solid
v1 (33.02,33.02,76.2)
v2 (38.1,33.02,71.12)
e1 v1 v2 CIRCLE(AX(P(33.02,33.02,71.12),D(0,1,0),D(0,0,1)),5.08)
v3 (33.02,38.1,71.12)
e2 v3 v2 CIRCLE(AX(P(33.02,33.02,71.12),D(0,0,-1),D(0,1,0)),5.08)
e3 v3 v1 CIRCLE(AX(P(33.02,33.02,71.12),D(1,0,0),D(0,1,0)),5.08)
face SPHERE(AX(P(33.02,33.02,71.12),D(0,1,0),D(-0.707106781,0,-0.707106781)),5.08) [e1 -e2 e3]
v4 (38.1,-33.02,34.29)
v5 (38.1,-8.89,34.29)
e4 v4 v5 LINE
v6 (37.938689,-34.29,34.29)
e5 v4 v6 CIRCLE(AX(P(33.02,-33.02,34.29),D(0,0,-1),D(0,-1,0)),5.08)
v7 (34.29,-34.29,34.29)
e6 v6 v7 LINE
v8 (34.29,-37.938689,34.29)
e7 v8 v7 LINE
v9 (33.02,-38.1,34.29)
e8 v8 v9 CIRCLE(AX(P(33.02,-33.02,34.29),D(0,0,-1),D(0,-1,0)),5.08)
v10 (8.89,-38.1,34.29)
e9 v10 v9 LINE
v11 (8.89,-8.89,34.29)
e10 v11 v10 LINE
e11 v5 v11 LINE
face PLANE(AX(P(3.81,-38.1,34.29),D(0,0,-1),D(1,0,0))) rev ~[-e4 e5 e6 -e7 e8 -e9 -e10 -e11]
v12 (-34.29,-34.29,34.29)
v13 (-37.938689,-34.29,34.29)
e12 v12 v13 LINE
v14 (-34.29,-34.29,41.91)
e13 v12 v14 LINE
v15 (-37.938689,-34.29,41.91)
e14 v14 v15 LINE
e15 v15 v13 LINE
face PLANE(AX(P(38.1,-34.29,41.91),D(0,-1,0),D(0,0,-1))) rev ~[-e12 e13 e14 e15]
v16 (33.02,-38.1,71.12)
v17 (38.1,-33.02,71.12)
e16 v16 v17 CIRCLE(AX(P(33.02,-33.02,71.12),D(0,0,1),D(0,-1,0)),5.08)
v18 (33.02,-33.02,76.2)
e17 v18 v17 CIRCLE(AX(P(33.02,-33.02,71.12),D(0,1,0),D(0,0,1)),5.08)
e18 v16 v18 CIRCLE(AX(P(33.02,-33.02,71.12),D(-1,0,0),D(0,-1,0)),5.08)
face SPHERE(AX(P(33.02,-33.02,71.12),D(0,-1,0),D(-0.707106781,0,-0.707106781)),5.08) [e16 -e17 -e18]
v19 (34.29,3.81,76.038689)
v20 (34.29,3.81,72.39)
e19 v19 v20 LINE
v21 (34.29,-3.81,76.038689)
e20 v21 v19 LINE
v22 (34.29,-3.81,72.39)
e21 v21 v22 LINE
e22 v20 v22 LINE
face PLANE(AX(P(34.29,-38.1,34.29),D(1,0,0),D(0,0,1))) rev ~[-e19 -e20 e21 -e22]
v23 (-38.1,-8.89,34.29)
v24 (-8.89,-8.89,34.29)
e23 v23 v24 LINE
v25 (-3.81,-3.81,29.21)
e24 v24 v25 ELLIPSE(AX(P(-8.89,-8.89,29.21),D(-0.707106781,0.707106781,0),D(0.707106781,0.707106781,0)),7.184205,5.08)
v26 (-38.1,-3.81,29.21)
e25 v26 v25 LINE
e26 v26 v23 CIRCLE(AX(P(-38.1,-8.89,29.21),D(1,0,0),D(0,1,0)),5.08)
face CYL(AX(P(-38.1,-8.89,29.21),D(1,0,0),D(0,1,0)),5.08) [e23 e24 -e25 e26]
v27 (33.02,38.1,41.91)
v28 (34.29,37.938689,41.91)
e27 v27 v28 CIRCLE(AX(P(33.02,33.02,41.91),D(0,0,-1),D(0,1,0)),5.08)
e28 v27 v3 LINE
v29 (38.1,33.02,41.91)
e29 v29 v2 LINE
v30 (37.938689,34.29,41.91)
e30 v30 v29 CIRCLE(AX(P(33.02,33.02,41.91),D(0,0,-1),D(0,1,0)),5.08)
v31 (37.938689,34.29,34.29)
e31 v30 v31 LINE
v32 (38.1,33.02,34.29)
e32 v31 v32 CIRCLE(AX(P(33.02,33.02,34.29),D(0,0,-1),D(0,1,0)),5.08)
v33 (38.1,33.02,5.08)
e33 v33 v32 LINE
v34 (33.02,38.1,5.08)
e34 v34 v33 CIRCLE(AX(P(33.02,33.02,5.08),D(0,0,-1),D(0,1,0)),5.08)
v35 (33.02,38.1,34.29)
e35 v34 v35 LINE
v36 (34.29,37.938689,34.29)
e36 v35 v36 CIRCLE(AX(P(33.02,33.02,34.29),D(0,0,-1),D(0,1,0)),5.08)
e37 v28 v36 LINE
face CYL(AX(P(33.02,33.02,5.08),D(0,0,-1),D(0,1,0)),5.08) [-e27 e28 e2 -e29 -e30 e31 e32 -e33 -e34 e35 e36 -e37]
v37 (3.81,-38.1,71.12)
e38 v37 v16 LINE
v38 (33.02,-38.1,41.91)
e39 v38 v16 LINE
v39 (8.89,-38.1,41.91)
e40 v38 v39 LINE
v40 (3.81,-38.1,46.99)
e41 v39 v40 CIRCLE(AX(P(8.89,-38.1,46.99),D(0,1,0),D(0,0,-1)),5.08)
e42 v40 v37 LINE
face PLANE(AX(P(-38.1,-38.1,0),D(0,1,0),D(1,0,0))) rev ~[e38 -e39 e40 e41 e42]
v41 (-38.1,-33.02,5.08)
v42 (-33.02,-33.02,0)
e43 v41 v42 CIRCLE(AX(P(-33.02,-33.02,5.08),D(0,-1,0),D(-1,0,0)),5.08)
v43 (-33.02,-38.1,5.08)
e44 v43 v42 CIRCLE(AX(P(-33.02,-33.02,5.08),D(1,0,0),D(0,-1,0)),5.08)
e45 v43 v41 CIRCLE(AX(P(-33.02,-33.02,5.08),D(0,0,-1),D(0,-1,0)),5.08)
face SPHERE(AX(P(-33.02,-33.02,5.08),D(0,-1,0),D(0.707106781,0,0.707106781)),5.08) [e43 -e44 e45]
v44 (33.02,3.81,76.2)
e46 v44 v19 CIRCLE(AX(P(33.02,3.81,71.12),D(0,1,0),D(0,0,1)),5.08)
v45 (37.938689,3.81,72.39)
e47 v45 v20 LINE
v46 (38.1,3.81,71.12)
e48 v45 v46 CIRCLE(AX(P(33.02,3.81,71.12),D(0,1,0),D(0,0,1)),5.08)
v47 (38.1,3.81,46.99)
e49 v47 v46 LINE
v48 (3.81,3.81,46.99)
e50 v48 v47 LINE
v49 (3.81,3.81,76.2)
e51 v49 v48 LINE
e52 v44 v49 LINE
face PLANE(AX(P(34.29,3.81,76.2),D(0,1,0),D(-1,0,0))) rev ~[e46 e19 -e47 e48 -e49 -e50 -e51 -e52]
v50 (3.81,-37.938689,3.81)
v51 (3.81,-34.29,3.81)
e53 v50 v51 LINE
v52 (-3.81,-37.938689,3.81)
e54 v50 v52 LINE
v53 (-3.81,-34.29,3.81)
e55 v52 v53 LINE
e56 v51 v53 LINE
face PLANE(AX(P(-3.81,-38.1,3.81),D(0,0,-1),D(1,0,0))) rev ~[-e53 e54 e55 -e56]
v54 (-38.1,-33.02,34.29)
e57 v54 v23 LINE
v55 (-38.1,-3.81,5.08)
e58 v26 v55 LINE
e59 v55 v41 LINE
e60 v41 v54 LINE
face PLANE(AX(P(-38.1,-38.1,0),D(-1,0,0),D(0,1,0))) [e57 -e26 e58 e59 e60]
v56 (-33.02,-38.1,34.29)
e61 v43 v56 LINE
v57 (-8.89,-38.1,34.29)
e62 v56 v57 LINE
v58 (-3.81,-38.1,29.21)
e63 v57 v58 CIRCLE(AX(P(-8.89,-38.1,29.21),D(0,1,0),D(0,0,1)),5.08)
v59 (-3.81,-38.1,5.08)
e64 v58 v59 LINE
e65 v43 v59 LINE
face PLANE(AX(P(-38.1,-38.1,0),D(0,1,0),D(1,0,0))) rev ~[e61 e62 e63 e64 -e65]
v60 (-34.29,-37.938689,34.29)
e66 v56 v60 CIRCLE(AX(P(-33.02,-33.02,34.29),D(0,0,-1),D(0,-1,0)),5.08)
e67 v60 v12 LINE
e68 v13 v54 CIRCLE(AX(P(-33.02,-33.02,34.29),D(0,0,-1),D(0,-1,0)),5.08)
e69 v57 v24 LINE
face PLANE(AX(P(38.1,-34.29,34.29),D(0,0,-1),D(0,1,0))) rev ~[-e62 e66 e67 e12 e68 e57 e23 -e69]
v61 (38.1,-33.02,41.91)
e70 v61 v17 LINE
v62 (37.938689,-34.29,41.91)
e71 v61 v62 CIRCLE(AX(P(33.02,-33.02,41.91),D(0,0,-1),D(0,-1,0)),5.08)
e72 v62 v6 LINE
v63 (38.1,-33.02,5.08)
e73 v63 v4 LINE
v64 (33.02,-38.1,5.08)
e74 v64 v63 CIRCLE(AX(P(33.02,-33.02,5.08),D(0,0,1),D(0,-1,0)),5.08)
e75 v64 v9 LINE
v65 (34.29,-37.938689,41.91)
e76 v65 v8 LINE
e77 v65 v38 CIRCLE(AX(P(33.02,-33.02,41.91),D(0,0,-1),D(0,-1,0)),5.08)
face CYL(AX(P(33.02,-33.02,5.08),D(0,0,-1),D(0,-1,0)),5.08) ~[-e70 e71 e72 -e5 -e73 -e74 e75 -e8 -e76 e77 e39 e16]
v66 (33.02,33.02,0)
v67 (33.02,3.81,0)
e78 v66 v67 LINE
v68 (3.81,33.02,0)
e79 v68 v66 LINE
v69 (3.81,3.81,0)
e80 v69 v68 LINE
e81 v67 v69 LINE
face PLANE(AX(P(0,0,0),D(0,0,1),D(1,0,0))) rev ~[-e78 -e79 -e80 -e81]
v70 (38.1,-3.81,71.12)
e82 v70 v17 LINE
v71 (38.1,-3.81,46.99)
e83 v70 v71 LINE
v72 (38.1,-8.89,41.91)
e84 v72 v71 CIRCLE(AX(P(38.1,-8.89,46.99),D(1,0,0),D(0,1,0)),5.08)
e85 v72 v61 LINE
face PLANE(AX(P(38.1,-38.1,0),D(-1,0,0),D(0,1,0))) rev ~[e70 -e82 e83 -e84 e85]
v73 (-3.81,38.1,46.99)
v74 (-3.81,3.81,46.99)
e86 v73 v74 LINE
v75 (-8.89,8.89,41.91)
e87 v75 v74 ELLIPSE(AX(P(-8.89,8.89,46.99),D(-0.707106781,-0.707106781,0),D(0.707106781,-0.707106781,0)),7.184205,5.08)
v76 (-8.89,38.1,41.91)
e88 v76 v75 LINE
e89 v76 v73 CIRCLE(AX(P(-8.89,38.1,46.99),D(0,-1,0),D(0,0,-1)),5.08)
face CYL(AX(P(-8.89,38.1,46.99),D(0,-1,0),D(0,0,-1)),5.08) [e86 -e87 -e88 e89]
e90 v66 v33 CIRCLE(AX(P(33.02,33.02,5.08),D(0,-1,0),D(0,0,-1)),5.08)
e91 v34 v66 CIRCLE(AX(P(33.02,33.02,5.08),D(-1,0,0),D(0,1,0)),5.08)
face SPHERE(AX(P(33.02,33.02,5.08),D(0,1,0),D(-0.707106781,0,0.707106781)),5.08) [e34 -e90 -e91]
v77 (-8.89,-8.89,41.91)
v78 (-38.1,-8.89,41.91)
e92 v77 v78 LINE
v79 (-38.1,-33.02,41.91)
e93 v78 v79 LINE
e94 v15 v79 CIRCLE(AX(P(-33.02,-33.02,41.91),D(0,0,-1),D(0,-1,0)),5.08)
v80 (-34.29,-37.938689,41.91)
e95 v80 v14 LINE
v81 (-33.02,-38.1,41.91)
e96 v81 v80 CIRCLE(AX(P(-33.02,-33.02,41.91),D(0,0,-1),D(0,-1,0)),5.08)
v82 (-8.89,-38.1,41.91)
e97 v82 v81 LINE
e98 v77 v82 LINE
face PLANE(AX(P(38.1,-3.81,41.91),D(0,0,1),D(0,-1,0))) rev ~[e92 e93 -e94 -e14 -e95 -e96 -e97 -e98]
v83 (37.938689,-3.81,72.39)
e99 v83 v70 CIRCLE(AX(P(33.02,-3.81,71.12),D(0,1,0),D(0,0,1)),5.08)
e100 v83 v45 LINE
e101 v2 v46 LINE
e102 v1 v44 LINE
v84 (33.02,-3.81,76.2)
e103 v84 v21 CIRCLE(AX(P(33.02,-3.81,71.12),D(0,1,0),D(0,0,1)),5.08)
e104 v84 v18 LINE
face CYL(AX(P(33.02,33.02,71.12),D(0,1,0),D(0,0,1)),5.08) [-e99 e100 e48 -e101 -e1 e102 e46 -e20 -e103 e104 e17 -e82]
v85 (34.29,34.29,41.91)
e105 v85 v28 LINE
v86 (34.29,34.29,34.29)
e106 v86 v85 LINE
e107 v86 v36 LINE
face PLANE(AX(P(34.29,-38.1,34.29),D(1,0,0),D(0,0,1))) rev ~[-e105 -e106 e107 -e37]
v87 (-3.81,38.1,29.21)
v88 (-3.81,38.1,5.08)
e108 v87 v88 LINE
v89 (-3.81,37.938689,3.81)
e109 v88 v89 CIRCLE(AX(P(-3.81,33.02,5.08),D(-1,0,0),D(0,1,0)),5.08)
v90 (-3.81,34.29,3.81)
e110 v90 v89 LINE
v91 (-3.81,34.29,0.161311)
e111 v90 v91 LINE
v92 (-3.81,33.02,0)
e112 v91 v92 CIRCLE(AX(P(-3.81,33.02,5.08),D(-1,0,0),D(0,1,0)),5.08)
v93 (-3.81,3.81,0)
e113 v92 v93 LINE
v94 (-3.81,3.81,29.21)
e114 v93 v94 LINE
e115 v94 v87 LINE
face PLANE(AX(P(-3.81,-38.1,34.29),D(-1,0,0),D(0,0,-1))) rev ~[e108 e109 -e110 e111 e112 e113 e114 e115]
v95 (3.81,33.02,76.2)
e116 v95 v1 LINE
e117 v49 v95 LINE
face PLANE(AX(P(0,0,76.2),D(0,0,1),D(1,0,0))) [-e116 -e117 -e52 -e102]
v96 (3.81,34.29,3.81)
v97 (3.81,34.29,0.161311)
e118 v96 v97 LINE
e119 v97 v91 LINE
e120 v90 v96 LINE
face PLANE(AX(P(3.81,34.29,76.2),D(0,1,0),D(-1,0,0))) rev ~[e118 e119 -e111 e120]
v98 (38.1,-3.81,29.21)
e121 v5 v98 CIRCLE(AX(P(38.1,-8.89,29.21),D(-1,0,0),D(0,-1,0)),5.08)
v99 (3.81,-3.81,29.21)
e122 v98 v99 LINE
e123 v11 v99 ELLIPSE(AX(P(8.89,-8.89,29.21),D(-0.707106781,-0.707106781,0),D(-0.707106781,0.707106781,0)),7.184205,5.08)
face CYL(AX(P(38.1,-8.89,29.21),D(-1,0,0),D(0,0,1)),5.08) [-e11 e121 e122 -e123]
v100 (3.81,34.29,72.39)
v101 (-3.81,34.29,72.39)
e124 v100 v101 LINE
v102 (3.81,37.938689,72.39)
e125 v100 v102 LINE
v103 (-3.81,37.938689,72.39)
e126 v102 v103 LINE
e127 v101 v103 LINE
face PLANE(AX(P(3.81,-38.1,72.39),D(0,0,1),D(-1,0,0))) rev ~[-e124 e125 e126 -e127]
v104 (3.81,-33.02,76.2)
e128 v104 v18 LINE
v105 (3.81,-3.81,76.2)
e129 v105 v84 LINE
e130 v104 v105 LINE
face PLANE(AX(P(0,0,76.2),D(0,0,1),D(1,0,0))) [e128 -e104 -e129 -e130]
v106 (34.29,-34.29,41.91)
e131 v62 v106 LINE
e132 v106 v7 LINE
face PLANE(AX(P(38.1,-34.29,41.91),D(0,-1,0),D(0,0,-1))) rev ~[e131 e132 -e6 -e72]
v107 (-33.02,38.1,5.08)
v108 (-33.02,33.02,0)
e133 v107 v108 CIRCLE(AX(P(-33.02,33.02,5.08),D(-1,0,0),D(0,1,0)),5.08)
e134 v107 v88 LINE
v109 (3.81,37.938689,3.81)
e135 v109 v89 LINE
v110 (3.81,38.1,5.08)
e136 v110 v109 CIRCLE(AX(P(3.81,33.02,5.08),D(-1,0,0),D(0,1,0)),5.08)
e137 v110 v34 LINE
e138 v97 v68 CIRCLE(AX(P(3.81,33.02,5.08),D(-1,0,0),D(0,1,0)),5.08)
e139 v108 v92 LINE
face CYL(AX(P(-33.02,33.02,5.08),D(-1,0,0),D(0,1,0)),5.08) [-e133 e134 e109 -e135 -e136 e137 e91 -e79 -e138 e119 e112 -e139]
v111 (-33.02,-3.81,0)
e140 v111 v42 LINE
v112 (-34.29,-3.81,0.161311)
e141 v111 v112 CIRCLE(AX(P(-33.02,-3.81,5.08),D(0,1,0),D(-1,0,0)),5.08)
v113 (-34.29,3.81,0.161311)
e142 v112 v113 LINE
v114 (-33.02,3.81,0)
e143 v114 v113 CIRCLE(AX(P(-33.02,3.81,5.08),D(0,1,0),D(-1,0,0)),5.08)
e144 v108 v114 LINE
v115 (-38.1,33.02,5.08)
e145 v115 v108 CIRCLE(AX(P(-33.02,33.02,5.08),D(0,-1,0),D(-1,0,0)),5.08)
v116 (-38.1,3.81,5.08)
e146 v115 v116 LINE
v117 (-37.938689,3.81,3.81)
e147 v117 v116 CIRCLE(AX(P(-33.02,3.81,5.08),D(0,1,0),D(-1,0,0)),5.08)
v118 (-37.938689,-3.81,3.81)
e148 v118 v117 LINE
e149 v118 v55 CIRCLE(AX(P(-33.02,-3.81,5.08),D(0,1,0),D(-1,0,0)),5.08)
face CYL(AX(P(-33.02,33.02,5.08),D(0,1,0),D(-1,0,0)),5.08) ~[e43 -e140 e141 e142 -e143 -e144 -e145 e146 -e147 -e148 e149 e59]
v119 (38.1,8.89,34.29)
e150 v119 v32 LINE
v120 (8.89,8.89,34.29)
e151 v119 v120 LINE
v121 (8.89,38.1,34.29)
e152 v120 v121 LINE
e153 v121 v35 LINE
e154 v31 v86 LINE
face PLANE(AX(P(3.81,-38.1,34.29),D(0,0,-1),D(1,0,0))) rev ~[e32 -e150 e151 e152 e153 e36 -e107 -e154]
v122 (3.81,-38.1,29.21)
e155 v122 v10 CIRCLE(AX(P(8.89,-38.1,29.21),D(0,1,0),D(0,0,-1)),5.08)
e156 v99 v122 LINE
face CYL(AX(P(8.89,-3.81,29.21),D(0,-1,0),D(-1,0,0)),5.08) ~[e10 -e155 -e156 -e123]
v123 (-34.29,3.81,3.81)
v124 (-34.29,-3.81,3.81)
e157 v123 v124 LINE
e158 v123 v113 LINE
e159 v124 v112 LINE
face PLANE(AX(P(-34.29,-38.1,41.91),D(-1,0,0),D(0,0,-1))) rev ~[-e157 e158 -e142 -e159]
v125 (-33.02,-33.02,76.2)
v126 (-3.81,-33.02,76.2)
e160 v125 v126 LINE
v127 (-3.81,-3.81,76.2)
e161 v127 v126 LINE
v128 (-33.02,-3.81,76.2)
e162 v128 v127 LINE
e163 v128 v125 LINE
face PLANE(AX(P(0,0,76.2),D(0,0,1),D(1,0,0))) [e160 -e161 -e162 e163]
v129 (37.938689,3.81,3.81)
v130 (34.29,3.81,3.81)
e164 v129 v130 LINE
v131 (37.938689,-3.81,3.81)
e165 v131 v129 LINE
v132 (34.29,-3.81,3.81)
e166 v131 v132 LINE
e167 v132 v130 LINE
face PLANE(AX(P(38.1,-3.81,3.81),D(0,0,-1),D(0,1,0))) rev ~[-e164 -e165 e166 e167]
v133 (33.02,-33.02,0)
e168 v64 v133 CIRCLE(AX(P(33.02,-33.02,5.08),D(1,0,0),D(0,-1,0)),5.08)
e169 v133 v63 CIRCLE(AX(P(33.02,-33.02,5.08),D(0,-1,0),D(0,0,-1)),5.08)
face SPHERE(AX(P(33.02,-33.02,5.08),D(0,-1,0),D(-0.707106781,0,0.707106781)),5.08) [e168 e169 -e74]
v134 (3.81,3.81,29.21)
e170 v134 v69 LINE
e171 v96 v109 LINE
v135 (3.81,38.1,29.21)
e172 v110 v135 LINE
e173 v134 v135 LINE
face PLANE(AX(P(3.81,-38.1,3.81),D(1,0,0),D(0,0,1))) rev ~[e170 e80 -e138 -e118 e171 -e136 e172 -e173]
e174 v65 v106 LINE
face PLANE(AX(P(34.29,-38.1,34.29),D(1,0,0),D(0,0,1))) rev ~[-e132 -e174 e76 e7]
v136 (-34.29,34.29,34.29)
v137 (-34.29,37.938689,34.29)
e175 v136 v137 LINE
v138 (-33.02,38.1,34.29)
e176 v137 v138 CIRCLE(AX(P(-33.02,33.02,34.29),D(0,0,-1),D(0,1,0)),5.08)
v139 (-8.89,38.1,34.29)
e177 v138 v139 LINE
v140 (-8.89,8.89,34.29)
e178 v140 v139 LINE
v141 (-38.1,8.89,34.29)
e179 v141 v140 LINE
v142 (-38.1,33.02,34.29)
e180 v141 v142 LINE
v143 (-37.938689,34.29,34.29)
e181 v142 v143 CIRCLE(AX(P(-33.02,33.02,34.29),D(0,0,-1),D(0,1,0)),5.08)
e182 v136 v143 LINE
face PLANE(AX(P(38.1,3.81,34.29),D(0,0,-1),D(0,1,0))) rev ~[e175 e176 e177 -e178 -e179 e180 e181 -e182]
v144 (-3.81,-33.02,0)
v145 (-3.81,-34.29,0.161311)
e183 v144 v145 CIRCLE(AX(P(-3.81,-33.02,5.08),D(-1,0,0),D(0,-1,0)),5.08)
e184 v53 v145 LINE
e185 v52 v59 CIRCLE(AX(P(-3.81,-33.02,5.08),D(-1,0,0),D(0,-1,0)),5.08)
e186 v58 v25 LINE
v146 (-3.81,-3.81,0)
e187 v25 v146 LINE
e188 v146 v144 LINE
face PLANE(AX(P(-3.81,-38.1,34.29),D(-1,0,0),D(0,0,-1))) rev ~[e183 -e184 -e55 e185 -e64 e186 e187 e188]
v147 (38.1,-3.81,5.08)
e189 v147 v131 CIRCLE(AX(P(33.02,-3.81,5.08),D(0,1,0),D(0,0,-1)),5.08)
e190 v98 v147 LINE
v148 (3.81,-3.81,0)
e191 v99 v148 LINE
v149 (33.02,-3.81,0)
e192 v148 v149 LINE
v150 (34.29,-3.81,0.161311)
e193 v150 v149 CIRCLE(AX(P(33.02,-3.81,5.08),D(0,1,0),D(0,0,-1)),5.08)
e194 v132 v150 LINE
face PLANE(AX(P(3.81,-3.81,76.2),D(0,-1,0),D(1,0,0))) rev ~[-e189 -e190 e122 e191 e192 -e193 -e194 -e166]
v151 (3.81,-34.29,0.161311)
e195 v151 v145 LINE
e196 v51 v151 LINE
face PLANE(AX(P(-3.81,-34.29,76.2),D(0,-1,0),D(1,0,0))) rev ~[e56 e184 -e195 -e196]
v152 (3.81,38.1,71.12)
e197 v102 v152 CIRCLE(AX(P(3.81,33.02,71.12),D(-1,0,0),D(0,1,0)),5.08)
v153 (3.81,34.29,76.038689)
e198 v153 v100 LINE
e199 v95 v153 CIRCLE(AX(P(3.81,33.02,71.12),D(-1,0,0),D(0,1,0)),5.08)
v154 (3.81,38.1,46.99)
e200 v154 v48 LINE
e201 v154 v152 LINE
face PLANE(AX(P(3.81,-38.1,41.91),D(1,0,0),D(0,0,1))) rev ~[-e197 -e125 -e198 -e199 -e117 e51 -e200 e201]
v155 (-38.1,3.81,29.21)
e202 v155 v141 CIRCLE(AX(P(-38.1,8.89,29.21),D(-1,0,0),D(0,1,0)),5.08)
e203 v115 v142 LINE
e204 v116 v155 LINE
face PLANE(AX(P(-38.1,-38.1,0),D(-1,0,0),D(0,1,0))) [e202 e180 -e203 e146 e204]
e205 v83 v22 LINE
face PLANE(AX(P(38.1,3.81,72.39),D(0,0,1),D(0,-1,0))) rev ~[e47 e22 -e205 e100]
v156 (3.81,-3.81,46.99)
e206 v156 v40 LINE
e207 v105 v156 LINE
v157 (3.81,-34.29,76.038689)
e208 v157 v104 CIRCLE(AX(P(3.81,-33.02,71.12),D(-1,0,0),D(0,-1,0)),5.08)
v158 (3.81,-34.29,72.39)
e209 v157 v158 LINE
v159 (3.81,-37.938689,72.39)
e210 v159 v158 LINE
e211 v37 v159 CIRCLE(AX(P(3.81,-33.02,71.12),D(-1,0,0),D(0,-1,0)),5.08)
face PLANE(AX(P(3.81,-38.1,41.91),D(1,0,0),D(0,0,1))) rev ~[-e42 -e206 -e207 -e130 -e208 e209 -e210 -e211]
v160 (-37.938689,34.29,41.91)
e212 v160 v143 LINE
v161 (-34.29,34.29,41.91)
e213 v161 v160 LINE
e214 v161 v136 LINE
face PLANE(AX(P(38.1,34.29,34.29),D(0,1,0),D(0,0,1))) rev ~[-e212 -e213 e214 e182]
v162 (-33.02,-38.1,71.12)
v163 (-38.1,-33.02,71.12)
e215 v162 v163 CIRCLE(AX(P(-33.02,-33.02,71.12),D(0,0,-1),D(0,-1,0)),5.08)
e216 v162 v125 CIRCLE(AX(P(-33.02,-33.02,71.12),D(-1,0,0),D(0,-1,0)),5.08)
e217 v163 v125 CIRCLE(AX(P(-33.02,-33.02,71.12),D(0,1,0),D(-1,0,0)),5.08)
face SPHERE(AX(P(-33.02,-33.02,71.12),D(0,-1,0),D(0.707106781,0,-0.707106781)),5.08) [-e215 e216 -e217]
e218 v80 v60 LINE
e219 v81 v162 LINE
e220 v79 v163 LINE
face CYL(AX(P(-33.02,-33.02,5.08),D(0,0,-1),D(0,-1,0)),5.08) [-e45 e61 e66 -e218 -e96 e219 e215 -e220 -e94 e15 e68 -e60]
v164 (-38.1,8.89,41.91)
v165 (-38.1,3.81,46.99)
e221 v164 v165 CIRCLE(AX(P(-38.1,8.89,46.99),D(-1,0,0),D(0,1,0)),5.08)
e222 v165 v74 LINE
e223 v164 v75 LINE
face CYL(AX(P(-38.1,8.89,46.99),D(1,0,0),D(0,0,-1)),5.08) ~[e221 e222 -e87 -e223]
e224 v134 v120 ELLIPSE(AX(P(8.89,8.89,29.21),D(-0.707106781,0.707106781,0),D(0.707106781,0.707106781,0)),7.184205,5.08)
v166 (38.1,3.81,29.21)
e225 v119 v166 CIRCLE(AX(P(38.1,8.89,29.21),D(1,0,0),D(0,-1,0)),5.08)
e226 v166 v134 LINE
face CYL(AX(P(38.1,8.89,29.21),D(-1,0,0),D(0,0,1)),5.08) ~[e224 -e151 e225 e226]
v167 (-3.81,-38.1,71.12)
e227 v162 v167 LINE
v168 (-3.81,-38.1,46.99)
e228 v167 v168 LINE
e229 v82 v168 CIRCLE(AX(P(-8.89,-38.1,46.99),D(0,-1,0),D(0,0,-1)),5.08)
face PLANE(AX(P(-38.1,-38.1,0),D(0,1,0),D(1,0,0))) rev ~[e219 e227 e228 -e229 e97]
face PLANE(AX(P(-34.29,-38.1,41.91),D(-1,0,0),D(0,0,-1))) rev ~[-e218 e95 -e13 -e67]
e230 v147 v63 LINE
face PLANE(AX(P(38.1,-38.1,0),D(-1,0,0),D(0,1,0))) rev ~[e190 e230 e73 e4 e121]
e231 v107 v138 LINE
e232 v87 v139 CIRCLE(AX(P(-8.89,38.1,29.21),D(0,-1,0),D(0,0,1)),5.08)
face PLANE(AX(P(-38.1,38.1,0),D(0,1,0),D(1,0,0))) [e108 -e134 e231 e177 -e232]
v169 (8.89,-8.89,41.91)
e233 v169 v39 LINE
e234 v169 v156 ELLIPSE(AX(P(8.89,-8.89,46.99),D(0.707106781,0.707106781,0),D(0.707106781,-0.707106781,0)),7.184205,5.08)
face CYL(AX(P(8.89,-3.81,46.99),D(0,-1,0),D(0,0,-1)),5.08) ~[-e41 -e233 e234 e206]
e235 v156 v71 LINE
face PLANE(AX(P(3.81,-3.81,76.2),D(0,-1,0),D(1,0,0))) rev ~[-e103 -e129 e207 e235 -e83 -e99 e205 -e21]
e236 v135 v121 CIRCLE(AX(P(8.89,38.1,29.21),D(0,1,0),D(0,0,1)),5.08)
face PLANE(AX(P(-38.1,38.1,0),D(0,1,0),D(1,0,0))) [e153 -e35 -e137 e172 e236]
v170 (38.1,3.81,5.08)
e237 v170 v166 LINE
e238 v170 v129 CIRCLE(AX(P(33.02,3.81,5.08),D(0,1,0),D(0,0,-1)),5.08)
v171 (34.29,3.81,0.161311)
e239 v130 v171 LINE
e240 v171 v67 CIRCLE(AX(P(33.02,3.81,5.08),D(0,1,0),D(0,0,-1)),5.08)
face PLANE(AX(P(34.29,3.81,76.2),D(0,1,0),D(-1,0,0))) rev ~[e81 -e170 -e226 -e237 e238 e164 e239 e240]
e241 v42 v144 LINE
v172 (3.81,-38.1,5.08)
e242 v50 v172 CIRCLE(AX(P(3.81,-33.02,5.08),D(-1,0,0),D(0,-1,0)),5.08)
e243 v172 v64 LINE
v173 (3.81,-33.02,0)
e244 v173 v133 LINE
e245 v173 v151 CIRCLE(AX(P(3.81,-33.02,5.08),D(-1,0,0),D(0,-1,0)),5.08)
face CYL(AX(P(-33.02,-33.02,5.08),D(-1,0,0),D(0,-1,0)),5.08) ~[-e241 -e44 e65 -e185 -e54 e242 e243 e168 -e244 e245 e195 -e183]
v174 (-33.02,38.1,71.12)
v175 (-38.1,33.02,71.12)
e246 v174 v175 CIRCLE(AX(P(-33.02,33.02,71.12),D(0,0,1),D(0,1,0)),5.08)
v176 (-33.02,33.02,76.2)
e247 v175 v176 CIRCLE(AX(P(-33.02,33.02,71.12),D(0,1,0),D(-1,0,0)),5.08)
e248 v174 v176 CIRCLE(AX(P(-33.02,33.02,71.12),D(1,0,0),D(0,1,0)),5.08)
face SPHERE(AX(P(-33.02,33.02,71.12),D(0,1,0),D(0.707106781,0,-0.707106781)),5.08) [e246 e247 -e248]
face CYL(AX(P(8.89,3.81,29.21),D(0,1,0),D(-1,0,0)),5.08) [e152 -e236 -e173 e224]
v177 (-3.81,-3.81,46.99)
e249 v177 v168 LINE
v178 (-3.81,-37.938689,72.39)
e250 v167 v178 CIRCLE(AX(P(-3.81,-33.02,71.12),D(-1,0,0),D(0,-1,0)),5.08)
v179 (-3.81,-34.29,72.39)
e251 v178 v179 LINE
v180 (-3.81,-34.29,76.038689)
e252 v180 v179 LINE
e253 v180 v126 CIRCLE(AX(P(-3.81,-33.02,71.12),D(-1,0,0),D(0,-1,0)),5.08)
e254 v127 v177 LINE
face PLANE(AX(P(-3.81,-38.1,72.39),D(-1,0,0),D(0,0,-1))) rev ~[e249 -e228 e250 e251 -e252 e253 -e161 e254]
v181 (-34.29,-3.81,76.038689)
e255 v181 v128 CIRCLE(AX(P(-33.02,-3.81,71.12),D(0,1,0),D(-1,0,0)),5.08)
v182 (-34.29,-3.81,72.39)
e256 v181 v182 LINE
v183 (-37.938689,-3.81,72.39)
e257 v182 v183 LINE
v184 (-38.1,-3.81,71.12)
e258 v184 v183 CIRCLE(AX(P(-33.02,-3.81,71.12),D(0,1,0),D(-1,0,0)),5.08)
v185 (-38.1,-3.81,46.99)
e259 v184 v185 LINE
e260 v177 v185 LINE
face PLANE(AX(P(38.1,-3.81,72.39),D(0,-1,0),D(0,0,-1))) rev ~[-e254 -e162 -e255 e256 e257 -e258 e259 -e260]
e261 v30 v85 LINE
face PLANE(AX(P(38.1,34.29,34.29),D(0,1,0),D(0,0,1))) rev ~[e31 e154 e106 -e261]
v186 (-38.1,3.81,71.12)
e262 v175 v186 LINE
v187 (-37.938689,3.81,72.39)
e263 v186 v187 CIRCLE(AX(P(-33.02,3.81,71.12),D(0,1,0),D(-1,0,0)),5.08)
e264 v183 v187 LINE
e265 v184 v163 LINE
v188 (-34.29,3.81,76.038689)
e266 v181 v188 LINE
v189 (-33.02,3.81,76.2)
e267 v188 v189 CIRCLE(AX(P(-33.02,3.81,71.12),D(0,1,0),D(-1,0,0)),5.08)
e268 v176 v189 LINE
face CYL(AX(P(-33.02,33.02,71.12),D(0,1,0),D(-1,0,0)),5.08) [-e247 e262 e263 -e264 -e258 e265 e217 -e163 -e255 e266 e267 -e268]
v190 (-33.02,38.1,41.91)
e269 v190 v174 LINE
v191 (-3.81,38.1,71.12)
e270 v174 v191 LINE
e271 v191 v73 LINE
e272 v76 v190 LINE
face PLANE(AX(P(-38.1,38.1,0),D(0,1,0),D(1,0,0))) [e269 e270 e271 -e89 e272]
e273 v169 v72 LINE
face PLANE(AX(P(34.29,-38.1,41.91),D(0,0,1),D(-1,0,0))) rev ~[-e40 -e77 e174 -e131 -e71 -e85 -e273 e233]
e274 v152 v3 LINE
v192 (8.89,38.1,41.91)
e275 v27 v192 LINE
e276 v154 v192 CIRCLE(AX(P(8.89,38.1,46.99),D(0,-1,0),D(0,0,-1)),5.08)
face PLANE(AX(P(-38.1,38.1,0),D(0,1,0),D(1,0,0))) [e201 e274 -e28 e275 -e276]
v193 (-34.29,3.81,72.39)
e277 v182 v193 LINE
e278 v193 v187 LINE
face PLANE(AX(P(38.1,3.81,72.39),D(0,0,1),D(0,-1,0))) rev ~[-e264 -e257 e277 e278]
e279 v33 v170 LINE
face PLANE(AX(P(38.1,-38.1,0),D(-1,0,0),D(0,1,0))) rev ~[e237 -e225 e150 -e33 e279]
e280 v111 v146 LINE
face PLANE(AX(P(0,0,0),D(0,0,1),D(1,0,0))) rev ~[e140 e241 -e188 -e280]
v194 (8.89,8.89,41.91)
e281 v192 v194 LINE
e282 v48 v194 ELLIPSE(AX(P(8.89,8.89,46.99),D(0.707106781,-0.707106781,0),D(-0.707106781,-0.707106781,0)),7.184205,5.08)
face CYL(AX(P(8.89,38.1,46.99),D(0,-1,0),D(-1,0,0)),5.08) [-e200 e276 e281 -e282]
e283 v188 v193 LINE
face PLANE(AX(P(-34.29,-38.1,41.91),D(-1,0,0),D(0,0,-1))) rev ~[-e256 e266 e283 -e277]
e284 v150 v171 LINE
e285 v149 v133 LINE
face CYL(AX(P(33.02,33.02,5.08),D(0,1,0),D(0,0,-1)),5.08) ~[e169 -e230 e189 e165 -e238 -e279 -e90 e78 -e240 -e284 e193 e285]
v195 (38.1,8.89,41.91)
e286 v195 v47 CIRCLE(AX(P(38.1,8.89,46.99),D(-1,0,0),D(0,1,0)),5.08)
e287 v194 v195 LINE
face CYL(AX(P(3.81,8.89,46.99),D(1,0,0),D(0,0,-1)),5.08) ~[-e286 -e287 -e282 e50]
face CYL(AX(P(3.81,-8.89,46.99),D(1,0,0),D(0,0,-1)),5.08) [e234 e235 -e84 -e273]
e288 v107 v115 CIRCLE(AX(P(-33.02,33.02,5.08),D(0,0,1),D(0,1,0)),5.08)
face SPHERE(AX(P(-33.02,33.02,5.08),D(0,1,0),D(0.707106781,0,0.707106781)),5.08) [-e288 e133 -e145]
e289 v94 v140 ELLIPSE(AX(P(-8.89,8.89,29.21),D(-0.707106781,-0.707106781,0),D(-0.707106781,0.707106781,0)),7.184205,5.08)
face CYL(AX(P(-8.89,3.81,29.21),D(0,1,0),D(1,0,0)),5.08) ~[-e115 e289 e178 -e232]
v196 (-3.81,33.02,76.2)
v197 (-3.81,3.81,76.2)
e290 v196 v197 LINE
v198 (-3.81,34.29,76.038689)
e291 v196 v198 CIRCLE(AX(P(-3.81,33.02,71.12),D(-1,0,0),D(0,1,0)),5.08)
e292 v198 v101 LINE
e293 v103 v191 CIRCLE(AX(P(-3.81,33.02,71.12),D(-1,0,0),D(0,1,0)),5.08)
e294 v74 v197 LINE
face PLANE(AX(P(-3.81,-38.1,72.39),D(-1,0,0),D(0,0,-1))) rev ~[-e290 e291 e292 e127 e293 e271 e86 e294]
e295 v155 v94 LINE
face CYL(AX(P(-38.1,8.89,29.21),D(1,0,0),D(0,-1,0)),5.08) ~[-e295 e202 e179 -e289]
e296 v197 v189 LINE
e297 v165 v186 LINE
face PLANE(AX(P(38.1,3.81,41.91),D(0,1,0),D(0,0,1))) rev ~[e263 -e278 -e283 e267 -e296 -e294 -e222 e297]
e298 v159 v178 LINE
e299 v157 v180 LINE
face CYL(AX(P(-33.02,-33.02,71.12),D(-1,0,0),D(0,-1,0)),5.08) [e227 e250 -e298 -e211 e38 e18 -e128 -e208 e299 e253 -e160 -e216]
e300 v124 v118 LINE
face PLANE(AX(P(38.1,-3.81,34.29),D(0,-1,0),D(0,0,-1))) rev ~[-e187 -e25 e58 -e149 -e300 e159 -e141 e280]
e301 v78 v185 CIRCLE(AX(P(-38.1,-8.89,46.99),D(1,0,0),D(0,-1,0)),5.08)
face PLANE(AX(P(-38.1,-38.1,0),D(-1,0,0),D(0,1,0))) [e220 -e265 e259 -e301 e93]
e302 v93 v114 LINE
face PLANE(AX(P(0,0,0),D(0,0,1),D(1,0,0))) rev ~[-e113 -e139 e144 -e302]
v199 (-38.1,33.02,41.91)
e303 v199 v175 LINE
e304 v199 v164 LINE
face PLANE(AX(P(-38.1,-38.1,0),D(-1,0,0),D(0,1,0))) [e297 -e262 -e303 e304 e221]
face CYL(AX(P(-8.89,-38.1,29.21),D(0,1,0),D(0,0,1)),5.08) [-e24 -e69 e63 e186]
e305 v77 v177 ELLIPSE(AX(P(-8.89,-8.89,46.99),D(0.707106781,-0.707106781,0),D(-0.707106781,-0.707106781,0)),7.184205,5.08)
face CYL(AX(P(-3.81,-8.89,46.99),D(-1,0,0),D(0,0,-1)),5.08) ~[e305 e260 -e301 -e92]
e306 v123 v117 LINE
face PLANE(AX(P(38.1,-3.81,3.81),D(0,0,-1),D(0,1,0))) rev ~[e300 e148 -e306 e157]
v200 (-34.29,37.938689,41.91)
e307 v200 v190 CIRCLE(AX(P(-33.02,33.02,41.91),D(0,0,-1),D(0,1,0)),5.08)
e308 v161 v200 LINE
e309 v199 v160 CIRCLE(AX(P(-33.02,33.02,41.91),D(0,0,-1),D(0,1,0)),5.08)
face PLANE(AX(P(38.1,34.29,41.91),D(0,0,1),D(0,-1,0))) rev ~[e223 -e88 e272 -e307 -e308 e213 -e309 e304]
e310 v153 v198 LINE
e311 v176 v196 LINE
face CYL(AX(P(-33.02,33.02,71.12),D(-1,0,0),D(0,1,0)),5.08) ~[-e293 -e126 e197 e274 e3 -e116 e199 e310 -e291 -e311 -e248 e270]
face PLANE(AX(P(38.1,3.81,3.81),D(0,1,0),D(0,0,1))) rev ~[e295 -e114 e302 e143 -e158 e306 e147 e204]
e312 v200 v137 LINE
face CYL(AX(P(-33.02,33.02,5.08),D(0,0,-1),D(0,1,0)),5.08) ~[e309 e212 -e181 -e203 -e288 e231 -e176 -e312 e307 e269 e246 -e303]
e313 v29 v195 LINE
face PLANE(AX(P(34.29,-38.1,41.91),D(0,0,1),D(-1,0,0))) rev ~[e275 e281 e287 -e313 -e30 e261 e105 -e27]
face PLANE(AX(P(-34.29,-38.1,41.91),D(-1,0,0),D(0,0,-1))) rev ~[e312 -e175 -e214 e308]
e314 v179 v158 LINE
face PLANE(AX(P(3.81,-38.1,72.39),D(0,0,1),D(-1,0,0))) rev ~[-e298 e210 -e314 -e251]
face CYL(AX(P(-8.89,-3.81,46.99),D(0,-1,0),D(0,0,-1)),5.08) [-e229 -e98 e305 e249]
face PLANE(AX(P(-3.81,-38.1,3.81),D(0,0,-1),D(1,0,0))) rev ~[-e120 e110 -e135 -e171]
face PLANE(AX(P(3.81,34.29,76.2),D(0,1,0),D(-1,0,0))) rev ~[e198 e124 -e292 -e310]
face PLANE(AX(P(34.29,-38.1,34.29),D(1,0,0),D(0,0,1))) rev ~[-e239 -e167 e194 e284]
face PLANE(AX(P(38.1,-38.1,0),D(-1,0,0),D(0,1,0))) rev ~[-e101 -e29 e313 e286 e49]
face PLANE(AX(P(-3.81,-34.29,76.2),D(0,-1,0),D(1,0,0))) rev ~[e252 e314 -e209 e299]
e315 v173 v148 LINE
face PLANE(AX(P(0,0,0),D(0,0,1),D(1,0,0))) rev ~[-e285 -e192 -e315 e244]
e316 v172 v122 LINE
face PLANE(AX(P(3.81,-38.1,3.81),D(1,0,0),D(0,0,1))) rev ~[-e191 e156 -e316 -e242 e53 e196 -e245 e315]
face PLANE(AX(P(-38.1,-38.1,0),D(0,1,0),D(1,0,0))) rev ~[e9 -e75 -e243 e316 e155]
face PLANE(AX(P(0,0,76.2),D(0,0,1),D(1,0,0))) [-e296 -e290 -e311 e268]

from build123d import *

# Parameters (mm, degrees)
F0_W         = 76.2
F0_H         = 76.2
F1_DEPTH     = 76.2
F3_DEPTH     = 76.2
F5_DEPTH     = 76.2
F7_DEPTH     = 76.2
F8_T1_DEPTH  = 66.04
F8_T3_DEPTH  = 66.04
F8_T5_DEPTH  = 66.04
F8_S9_W      = 5.08
F8_S9_H      = 5.08
F8_T10_DEPTH = 5.08
F8_S15_W     = 5.08
F8_S15_H     = 5.08
F8_T16_DEPTH = 5.08
F8_S21_W     = 5.08
F8_S21_H     = 5.08
F8_T22_DEPTH = 5.08
F8_S27_W     = 5.08
F8_S27_H     = 5.08
F8_T28_DEPTH = 5.08
F8_S33_W     = 5.08
F8_S33_H     = 5.08
F8_T34_DEPTH = 5.08
F8_S39_W     = 5.08
F8_S39_H     = 5.08
F8_T40_DEPTH = 5.08
F8_S45_W     = 5.08
F8_S45_H     = 5.08
F8_T46_DEPTH = 5.08
F8_S51_W     = 5.08
F8_S51_H     = 5.08
F8_T52_DEPTH = 5.08
F9_R         = 5.08


# Not quite as in the source:
# - a fillet or chamfer that OpenCascade refuses, or shapes differently, is made with other operations: its cross-section is extruded or revolved along the edge and cut away or added


with BuildPart() as f1:
    # F0 (on Top) → F1 (new body)
    with BuildSketch(Plane.XY):
        Rectangle(F0_W, F0_H)
    extrude(amount=F1_DEPTH)

    # F2 (on face) → F3 (cut)
    with BuildSketch(Plane.XZ.offset(38.1)):
        Polygon((-3.81, 41.91), (-34.29, 41.91), (-34.29, 34.29), (-3.81, 34.29), (-3.81, 3.81), (3.81, 3.81), (3.81, 34.29), (34.29, 34.29), (34.29, 41.91), (3.81, 41.91), (3.81, 72.39), (-3.81, 72.39), align=None)
    extrude(amount=-F3_DEPTH, mode=Mode.SUBTRACT)

    # F4 (on face) → F5 (cut)
    with BuildSketch(Plane.XY.offset(76.2)):
        Polygon((3.81, 34.29), (-3.81, 34.29), (-3.81, 3.81), (-34.29, 3.81), (-34.29, -3.81), (-3.81, -3.81), (-3.81, -34.29), (3.81, -34.29), (3.81, -3.81), (34.29, -3.81), (34.29, 3.81), (3.81, 3.81), align=None)
    extrude(amount=-F5_DEPTH, mode=Mode.SUBTRACT)

    # F6 (on face) → F7 (cut)
    with BuildSketch(Plane.YZ.offset(38.1)):
        Polygon((-3.81, 41.91), (-34.29, 41.91), (-34.29, 34.29), (-3.81, 34.29), (-3.81, 3.81), (3.81, 3.81), (3.81, 34.29), (34.29, 34.29), (34.29, 41.91), (3.81, 41.91), (3.81, 72.39), (-3.81, 72.39), align=None)
    extrude(amount=-F7_DEPTH, mode=Mode.SUBTRACT)

    # F8: fillet of radius 5.08 on 12 edges, made by hand

    # F8_s2 → F8_t1 (cut)
    with BuildSketch(Plane.XY.offset(5.08)):
        with BuildLine():
            ThreePointArc((33.02, -38.1), (36.6121024484, -36.6121024484), (38.1, -33.02))
            Line((38.1, -33.02), (38.1, -38.1))
            Line((38.1, -38.1), (33.02, -38.1))
        make_face()
        with BuildLine():
            ThreePointArc((-33.02, -38.1), (-36.6121024484, -36.6121024484), (-38.1, -33.02))
            Line((-38.1, -33.02), (-38.1, -38.1))
            Line((-38.1, -38.1), (-33.02, -38.1))
        make_face()
        with BuildLine():
            ThreePointArc((33.02, 38.1), (36.6121024484, 36.6121024484), (38.1, 33.02))
            Line((38.1, 33.02), (38.1, 38.1))
            Line((38.1, 38.1), (33.02, 38.1))
        make_face()
        with BuildLine():
            ThreePointArc((-33.02, 38.1), (-36.6121024484, 36.6121024484), (-38.1, 33.02))
            Line((-38.1, 33.02), (-38.1, 38.1))
            Line((-38.1, 38.1), (-33.02, 38.1))
        make_face()
    extrude(amount=F8_T1_DEPTH, mode=Mode.SUBTRACT)

    # F8_s4 → F8_t3 (cut)
    with BuildSketch(Plane.YZ.offset(-33.02)):
        with BuildLine():
            ThreePointArc((-38.1, 71.12), (-36.6121024484, 74.7121024484), (-33.02, 76.2))
            Line((-33.02, 76.2), (-38.1, 76.2))
            Line((-38.1, 76.2), (-38.1, 71.12))
        make_face()
        with BuildLine():
            ThreePointArc((-38.1, 5.08), (-36.6121024484, 1.4878975516), (-33.02, 0))
            Line((-33.02, 0), (-38.1, 0))
            Line((-38.1, 0), (-38.1, 5.08))
        make_face()
        with BuildLine():
            ThreePointArc((38.1, 71.12), (36.6121024484, 74.7121024484), (33.02, 76.2))
            Line((33.02, 76.2), (38.1, 76.2))
            Line((38.1, 76.2), (38.1, 71.12))
        make_face()
        with BuildLine():
            ThreePointArc((38.1, 5.08), (36.6121024484, 1.4878975516), (33.02, 0))
            Line((33.02, 0), (38.1, 0))
            Line((38.1, 0), (38.1, 5.08))
        make_face()
    extrude(amount=F8_T3_DEPTH, mode=Mode.SUBTRACT)

    # F8_s6 → F8_t5 (cut)
    with BuildSketch(Plane.XZ.offset(-33.02)):
        with BuildLine():
            ThreePointArc((33.02, 76.2), (36.6121024484, 74.7121024484), (38.1, 71.12))
            Line((38.1, 71.12), (38.1, 76.2))
            Line((38.1, 76.2), (33.02, 76.2))
        make_face()
        with BuildLine():
            ThreePointArc((33.02, 0), (36.6121024484, 1.4878975516), (38.1, 5.08))
            Line((38.1, 5.08), (38.1, 0))
            Line((38.1, 0), (33.02, 0))
        make_face()
        with BuildLine():
            ThreePointArc((-38.1, 71.12), (-36.6121024484, 74.7121024484), (-33.02, 76.2))
            Line((-33.02, 76.2), (-38.1, 76.2))
            Line((-38.1, 76.2), (-38.1, 71.12))
        make_face()
        with BuildLine():
            ThreePointArc((-38.1, 5.08), (-36.6121024484, 1.4878975516), (-33.02, 0))
            Line((-33.02, 0), (-38.1, 0))
            Line((-38.1, 0), (-38.1, 5.08))
        make_face()
    extrude(amount=F8_T5_DEPTH, mode=Mode.SUBTRACT)


with BuildPart() as f8_tool8:
    # F8_s9 → F8_t10 (new body)
    with BuildSketch(Plane.XZ.offset(33.02)):
        with Locations((35.56, 2.54)):
            Rectangle(F8_S9_W, F8_S9_H)
    extrude(amount=F8_T10_DEPTH)

    # F8_s11 → F8_t12 (revolve, cut)
    with BuildSketch(Plane(origin=(33.02, -33.02, 5.08), x_dir=(-0.7071067812, 0, 0.7071067812), z_dir=(0.7071067812, 0, 0.7071067812))):
        with BuildLine():
            ThreePointArc((0, -5.08), (5.08, 0), (0, 5.08))
            Line((0, 5.08), (0, -5.08))
        make_face()
    revolve(axis=Axis((33.02, -33.02, 5.08), (0, -1, 0)), mode=Mode.SUBTRACT)


with BuildPart() as f1_1:
    add(f1.part)

    # F8_t7: cut F8_tool8
    add(f8_tool8.part, mode=Mode.SUBTRACT)


with BuildPart() as f8_tool14:
    # F8_s15 → F8_t16 (new body)
    with BuildSketch(Plane.XZ.offset(33.02)):
        with Locations((35.56, 73.66)):
            Rectangle(F8_S15_W, F8_S15_H)
    extrude(amount=F8_T16_DEPTH)

    # F8_s17 → F8_t18 (revolve, cut)
    with BuildSketch(Plane(origin=(33.02, -33.02, 71.12), x_dir=(-0.7071067812, 0, -0.7071067812), z_dir=(-0.7071067812, 0, 0.7071067812))):
        with BuildLine():
            ThreePointArc((0, -5.08), (5.08, 0), (0, 5.08))
            Line((0, 5.08), (0, -5.08))
        make_face()
    revolve(axis=Axis((33.02, -33.02, 71.12), (0, -1, 0)), mode=Mode.SUBTRACT)


with BuildPart() as f1_2:
    add(f1_1.part)

    # F8_t13: cut F8_tool14
    add(f8_tool14.part, mode=Mode.SUBTRACT)


with BuildPart() as f8_tool20:
    # F8_s21 → F8_t22 (new body)
    with BuildSketch(Plane.XZ.offset(33.02)):
        with Locations((-35.56, 73.66)):
            Rectangle(F8_S21_W, F8_S21_H)
    extrude(amount=F8_T22_DEPTH)

    # F8_s23 → F8_t24 (revolve, cut)
    with BuildSketch(Plane(origin=(-33.02, -33.02, 71.12), x_dir=(0.7071067812, 0, -0.7071067812), z_dir=(-0.7071067812, 0, -0.7071067812))):
        with BuildLine():
            ThreePointArc((0, -5.08), (5.08, 0), (0, 5.08))
            Line((0, 5.08), (0, -5.08))
        make_face()
    revolve(axis=Axis((-33.02, -33.02, 71.12), (0, -1, 0)), mode=Mode.SUBTRACT)


with BuildPart() as f1_3:
    add(f1_2.part)

    # F8_t19: cut F8_tool20
    add(f8_tool20.part, mode=Mode.SUBTRACT)


with BuildPart() as f8_tool26:
    # F8_s27 → F8_t28 (new body)
    with BuildSketch(Plane.XZ.offset(-33.02)):
        with Locations((35.56, 73.66)):
            Rectangle(F8_S27_W, F8_S27_H)
    extrude(amount=-F8_T28_DEPTH)

    # F8_s29 → F8_t30 (revolve, cut)
    with BuildSketch(Plane(origin=(33.02, 33.02, 71.12), x_dir=(-0.7071067812, 0, -0.7071067812), z_dir=(0.7071067812, 0, -0.7071067812))):
        with BuildLine():
            ThreePointArc((0, -5.08), (5.08, 0), (0, 5.08))
            Line((0, 5.08), (0, -5.08))
        make_face()
    revolve(axis=Axis((33.02, 33.02, 71.12), (0, 1, 0)), mode=Mode.SUBTRACT)


with BuildPart() as f1_4:
    add(f1_3.part)

    # F8_t25: cut F8_tool26
    add(f8_tool26.part, mode=Mode.SUBTRACT)


with BuildPart() as f8_tool32:
    # F8_s33 → F8_t34 (new body)
    with BuildSketch(Plane.XZ.offset(33.02)):
        with Locations((-35.56, 2.54)):
            Rectangle(F8_S33_W, F8_S33_H)
    extrude(amount=F8_T34_DEPTH)

    # F8_s35 → F8_t36 (revolve, cut)
    with BuildSketch(Plane(origin=(-33.02, -33.02, 5.08), x_dir=(0.7071067812, 0, 0.7071067812), z_dir=(0.7071067812, 0, -0.7071067812))):
        with BuildLine():
            ThreePointArc((0, -5.08), (5.08, 0), (0, 5.08))
            Line((0, 5.08), (0, -5.08))
        make_face()
    revolve(axis=Axis((-33.02, -33.02, 5.08), (0, -1, 0)), mode=Mode.SUBTRACT)


with BuildPart() as f1_5:
    add(f1_4.part)

    # F8_t31: cut F8_tool32
    add(f8_tool32.part, mode=Mode.SUBTRACT)


with BuildPart() as f8_tool38:
    # F8_s39 → F8_t40 (new body)
    with BuildSketch(Plane.XZ.offset(-33.02)):
        with Locations((35.56, 2.54)):
            Rectangle(F8_S39_W, F8_S39_H)
    extrude(amount=-F8_T40_DEPTH)

    # F8_s41 → F8_t42 (revolve, cut)
    with BuildSketch(Plane(origin=(33.02, 33.02, 5.08), x_dir=(-0.7071067812, 0, 0.7071067812), z_dir=(-0.7071067812, 0, -0.7071067812))):
        with BuildLine():
            ThreePointArc((0, -5.08), (5.08, 0), (0, 5.08))
            Line((0, 5.08), (0, -5.08))
        make_face()
    revolve(axis=Axis((33.02, 33.02, 5.08), (0, 1, 0)), mode=Mode.SUBTRACT)


with BuildPart() as f1_6:
    add(f1_5.part)

    # F8_t37: cut F8_tool38
    add(f8_tool38.part, mode=Mode.SUBTRACT)


with BuildPart() as f8_tool44:
    # F8_s45 → F8_t46 (new body)
    with BuildSketch(Plane.XZ.offset(-33.02)):
        with Locations((-35.56, 73.66)):
            Rectangle(F8_S45_W, F8_S45_H)
    extrude(amount=-F8_T46_DEPTH)

    # F8_s47 → F8_t48 (revolve, cut)
    with BuildSketch(Plane(origin=(-33.02, 33.02, 71.12), x_dir=(0.7071067812, 0, -0.7071067812), z_dir=(0.7071067812, 0, 0.7071067812))):
        with BuildLine():
            ThreePointArc((0, -5.08), (5.08, 0), (0, 5.08))
            Line((0, 5.08), (0, -5.08))
        make_face()
    revolve(axis=Axis((-33.02, 33.02, 71.12), (0, 1, 0)), mode=Mode.SUBTRACT)


with BuildPart() as f1_7:
    add(f1_6.part)

    # F8_t43: cut F8_tool44
    add(f8_tool44.part, mode=Mode.SUBTRACT)


with BuildPart() as f8_tool50:
    # F8_s51 → F8_t52 (new body)
    with BuildSketch(Plane.XZ.offset(-33.02)):
        with Locations((-35.56, 2.54)):
            Rectangle(F8_S51_W, F8_S51_H)
    extrude(amount=-F8_T52_DEPTH)

    # F8_s53 → F8_t54 (revolve, cut)
    with BuildSketch(Plane(origin=(-33.02, 33.02, 5.08), x_dir=(0.7071067812, 0, 0.7071067812), z_dir=(-0.7071067812, 0, 0.7071067812))):
        with BuildLine():
            ThreePointArc((0, -5.08), (5.08, 0), (0, 5.08))
            Line((0, 5.08), (0, -5.08))
        make_face()
    revolve(axis=Axis((-33.02, 33.02, 5.08), (0, 1, 0)), mode=Mode.SUBTRACT)


with BuildPart() as f1_8:
    add(f1_7.part)

    # F8_t49: cut F8_tool50
    add(f8_tool50.part, mode=Mode.SUBTRACT)

    # F9
    f9_edges = [f1_8.edges().sort_by_distance(p)[0] for p in [
        (3.81, 20.955, 34.29),
        (3.81, 20.955, 41.91),
        (-3.81, 20.955, 34.29),
        (-3.81, 20.955, 41.91),
        (20.955, 3.81, 34.29),
        (20.955, -3.81, 34.29),
        (20.955, -3.81, 41.91),
        (20.955, 3.81, 41.91),
        (-3.81, -20.955, 34.29),
        (-3.81, -20.955, 41.91),
        (3.81, -20.955, 34.29),
        (3.81, -20.955, 41.91),
        (-20.955, 3.81, 41.91),
        (-20.955, 3.81, 34.29),
        (-20.955, -3.81, 34.29),
        (-20.955, -3.81, 41.91),
    ]]
    fillet(f9_edges, radius=F9_R)


solid = f1_8.part
